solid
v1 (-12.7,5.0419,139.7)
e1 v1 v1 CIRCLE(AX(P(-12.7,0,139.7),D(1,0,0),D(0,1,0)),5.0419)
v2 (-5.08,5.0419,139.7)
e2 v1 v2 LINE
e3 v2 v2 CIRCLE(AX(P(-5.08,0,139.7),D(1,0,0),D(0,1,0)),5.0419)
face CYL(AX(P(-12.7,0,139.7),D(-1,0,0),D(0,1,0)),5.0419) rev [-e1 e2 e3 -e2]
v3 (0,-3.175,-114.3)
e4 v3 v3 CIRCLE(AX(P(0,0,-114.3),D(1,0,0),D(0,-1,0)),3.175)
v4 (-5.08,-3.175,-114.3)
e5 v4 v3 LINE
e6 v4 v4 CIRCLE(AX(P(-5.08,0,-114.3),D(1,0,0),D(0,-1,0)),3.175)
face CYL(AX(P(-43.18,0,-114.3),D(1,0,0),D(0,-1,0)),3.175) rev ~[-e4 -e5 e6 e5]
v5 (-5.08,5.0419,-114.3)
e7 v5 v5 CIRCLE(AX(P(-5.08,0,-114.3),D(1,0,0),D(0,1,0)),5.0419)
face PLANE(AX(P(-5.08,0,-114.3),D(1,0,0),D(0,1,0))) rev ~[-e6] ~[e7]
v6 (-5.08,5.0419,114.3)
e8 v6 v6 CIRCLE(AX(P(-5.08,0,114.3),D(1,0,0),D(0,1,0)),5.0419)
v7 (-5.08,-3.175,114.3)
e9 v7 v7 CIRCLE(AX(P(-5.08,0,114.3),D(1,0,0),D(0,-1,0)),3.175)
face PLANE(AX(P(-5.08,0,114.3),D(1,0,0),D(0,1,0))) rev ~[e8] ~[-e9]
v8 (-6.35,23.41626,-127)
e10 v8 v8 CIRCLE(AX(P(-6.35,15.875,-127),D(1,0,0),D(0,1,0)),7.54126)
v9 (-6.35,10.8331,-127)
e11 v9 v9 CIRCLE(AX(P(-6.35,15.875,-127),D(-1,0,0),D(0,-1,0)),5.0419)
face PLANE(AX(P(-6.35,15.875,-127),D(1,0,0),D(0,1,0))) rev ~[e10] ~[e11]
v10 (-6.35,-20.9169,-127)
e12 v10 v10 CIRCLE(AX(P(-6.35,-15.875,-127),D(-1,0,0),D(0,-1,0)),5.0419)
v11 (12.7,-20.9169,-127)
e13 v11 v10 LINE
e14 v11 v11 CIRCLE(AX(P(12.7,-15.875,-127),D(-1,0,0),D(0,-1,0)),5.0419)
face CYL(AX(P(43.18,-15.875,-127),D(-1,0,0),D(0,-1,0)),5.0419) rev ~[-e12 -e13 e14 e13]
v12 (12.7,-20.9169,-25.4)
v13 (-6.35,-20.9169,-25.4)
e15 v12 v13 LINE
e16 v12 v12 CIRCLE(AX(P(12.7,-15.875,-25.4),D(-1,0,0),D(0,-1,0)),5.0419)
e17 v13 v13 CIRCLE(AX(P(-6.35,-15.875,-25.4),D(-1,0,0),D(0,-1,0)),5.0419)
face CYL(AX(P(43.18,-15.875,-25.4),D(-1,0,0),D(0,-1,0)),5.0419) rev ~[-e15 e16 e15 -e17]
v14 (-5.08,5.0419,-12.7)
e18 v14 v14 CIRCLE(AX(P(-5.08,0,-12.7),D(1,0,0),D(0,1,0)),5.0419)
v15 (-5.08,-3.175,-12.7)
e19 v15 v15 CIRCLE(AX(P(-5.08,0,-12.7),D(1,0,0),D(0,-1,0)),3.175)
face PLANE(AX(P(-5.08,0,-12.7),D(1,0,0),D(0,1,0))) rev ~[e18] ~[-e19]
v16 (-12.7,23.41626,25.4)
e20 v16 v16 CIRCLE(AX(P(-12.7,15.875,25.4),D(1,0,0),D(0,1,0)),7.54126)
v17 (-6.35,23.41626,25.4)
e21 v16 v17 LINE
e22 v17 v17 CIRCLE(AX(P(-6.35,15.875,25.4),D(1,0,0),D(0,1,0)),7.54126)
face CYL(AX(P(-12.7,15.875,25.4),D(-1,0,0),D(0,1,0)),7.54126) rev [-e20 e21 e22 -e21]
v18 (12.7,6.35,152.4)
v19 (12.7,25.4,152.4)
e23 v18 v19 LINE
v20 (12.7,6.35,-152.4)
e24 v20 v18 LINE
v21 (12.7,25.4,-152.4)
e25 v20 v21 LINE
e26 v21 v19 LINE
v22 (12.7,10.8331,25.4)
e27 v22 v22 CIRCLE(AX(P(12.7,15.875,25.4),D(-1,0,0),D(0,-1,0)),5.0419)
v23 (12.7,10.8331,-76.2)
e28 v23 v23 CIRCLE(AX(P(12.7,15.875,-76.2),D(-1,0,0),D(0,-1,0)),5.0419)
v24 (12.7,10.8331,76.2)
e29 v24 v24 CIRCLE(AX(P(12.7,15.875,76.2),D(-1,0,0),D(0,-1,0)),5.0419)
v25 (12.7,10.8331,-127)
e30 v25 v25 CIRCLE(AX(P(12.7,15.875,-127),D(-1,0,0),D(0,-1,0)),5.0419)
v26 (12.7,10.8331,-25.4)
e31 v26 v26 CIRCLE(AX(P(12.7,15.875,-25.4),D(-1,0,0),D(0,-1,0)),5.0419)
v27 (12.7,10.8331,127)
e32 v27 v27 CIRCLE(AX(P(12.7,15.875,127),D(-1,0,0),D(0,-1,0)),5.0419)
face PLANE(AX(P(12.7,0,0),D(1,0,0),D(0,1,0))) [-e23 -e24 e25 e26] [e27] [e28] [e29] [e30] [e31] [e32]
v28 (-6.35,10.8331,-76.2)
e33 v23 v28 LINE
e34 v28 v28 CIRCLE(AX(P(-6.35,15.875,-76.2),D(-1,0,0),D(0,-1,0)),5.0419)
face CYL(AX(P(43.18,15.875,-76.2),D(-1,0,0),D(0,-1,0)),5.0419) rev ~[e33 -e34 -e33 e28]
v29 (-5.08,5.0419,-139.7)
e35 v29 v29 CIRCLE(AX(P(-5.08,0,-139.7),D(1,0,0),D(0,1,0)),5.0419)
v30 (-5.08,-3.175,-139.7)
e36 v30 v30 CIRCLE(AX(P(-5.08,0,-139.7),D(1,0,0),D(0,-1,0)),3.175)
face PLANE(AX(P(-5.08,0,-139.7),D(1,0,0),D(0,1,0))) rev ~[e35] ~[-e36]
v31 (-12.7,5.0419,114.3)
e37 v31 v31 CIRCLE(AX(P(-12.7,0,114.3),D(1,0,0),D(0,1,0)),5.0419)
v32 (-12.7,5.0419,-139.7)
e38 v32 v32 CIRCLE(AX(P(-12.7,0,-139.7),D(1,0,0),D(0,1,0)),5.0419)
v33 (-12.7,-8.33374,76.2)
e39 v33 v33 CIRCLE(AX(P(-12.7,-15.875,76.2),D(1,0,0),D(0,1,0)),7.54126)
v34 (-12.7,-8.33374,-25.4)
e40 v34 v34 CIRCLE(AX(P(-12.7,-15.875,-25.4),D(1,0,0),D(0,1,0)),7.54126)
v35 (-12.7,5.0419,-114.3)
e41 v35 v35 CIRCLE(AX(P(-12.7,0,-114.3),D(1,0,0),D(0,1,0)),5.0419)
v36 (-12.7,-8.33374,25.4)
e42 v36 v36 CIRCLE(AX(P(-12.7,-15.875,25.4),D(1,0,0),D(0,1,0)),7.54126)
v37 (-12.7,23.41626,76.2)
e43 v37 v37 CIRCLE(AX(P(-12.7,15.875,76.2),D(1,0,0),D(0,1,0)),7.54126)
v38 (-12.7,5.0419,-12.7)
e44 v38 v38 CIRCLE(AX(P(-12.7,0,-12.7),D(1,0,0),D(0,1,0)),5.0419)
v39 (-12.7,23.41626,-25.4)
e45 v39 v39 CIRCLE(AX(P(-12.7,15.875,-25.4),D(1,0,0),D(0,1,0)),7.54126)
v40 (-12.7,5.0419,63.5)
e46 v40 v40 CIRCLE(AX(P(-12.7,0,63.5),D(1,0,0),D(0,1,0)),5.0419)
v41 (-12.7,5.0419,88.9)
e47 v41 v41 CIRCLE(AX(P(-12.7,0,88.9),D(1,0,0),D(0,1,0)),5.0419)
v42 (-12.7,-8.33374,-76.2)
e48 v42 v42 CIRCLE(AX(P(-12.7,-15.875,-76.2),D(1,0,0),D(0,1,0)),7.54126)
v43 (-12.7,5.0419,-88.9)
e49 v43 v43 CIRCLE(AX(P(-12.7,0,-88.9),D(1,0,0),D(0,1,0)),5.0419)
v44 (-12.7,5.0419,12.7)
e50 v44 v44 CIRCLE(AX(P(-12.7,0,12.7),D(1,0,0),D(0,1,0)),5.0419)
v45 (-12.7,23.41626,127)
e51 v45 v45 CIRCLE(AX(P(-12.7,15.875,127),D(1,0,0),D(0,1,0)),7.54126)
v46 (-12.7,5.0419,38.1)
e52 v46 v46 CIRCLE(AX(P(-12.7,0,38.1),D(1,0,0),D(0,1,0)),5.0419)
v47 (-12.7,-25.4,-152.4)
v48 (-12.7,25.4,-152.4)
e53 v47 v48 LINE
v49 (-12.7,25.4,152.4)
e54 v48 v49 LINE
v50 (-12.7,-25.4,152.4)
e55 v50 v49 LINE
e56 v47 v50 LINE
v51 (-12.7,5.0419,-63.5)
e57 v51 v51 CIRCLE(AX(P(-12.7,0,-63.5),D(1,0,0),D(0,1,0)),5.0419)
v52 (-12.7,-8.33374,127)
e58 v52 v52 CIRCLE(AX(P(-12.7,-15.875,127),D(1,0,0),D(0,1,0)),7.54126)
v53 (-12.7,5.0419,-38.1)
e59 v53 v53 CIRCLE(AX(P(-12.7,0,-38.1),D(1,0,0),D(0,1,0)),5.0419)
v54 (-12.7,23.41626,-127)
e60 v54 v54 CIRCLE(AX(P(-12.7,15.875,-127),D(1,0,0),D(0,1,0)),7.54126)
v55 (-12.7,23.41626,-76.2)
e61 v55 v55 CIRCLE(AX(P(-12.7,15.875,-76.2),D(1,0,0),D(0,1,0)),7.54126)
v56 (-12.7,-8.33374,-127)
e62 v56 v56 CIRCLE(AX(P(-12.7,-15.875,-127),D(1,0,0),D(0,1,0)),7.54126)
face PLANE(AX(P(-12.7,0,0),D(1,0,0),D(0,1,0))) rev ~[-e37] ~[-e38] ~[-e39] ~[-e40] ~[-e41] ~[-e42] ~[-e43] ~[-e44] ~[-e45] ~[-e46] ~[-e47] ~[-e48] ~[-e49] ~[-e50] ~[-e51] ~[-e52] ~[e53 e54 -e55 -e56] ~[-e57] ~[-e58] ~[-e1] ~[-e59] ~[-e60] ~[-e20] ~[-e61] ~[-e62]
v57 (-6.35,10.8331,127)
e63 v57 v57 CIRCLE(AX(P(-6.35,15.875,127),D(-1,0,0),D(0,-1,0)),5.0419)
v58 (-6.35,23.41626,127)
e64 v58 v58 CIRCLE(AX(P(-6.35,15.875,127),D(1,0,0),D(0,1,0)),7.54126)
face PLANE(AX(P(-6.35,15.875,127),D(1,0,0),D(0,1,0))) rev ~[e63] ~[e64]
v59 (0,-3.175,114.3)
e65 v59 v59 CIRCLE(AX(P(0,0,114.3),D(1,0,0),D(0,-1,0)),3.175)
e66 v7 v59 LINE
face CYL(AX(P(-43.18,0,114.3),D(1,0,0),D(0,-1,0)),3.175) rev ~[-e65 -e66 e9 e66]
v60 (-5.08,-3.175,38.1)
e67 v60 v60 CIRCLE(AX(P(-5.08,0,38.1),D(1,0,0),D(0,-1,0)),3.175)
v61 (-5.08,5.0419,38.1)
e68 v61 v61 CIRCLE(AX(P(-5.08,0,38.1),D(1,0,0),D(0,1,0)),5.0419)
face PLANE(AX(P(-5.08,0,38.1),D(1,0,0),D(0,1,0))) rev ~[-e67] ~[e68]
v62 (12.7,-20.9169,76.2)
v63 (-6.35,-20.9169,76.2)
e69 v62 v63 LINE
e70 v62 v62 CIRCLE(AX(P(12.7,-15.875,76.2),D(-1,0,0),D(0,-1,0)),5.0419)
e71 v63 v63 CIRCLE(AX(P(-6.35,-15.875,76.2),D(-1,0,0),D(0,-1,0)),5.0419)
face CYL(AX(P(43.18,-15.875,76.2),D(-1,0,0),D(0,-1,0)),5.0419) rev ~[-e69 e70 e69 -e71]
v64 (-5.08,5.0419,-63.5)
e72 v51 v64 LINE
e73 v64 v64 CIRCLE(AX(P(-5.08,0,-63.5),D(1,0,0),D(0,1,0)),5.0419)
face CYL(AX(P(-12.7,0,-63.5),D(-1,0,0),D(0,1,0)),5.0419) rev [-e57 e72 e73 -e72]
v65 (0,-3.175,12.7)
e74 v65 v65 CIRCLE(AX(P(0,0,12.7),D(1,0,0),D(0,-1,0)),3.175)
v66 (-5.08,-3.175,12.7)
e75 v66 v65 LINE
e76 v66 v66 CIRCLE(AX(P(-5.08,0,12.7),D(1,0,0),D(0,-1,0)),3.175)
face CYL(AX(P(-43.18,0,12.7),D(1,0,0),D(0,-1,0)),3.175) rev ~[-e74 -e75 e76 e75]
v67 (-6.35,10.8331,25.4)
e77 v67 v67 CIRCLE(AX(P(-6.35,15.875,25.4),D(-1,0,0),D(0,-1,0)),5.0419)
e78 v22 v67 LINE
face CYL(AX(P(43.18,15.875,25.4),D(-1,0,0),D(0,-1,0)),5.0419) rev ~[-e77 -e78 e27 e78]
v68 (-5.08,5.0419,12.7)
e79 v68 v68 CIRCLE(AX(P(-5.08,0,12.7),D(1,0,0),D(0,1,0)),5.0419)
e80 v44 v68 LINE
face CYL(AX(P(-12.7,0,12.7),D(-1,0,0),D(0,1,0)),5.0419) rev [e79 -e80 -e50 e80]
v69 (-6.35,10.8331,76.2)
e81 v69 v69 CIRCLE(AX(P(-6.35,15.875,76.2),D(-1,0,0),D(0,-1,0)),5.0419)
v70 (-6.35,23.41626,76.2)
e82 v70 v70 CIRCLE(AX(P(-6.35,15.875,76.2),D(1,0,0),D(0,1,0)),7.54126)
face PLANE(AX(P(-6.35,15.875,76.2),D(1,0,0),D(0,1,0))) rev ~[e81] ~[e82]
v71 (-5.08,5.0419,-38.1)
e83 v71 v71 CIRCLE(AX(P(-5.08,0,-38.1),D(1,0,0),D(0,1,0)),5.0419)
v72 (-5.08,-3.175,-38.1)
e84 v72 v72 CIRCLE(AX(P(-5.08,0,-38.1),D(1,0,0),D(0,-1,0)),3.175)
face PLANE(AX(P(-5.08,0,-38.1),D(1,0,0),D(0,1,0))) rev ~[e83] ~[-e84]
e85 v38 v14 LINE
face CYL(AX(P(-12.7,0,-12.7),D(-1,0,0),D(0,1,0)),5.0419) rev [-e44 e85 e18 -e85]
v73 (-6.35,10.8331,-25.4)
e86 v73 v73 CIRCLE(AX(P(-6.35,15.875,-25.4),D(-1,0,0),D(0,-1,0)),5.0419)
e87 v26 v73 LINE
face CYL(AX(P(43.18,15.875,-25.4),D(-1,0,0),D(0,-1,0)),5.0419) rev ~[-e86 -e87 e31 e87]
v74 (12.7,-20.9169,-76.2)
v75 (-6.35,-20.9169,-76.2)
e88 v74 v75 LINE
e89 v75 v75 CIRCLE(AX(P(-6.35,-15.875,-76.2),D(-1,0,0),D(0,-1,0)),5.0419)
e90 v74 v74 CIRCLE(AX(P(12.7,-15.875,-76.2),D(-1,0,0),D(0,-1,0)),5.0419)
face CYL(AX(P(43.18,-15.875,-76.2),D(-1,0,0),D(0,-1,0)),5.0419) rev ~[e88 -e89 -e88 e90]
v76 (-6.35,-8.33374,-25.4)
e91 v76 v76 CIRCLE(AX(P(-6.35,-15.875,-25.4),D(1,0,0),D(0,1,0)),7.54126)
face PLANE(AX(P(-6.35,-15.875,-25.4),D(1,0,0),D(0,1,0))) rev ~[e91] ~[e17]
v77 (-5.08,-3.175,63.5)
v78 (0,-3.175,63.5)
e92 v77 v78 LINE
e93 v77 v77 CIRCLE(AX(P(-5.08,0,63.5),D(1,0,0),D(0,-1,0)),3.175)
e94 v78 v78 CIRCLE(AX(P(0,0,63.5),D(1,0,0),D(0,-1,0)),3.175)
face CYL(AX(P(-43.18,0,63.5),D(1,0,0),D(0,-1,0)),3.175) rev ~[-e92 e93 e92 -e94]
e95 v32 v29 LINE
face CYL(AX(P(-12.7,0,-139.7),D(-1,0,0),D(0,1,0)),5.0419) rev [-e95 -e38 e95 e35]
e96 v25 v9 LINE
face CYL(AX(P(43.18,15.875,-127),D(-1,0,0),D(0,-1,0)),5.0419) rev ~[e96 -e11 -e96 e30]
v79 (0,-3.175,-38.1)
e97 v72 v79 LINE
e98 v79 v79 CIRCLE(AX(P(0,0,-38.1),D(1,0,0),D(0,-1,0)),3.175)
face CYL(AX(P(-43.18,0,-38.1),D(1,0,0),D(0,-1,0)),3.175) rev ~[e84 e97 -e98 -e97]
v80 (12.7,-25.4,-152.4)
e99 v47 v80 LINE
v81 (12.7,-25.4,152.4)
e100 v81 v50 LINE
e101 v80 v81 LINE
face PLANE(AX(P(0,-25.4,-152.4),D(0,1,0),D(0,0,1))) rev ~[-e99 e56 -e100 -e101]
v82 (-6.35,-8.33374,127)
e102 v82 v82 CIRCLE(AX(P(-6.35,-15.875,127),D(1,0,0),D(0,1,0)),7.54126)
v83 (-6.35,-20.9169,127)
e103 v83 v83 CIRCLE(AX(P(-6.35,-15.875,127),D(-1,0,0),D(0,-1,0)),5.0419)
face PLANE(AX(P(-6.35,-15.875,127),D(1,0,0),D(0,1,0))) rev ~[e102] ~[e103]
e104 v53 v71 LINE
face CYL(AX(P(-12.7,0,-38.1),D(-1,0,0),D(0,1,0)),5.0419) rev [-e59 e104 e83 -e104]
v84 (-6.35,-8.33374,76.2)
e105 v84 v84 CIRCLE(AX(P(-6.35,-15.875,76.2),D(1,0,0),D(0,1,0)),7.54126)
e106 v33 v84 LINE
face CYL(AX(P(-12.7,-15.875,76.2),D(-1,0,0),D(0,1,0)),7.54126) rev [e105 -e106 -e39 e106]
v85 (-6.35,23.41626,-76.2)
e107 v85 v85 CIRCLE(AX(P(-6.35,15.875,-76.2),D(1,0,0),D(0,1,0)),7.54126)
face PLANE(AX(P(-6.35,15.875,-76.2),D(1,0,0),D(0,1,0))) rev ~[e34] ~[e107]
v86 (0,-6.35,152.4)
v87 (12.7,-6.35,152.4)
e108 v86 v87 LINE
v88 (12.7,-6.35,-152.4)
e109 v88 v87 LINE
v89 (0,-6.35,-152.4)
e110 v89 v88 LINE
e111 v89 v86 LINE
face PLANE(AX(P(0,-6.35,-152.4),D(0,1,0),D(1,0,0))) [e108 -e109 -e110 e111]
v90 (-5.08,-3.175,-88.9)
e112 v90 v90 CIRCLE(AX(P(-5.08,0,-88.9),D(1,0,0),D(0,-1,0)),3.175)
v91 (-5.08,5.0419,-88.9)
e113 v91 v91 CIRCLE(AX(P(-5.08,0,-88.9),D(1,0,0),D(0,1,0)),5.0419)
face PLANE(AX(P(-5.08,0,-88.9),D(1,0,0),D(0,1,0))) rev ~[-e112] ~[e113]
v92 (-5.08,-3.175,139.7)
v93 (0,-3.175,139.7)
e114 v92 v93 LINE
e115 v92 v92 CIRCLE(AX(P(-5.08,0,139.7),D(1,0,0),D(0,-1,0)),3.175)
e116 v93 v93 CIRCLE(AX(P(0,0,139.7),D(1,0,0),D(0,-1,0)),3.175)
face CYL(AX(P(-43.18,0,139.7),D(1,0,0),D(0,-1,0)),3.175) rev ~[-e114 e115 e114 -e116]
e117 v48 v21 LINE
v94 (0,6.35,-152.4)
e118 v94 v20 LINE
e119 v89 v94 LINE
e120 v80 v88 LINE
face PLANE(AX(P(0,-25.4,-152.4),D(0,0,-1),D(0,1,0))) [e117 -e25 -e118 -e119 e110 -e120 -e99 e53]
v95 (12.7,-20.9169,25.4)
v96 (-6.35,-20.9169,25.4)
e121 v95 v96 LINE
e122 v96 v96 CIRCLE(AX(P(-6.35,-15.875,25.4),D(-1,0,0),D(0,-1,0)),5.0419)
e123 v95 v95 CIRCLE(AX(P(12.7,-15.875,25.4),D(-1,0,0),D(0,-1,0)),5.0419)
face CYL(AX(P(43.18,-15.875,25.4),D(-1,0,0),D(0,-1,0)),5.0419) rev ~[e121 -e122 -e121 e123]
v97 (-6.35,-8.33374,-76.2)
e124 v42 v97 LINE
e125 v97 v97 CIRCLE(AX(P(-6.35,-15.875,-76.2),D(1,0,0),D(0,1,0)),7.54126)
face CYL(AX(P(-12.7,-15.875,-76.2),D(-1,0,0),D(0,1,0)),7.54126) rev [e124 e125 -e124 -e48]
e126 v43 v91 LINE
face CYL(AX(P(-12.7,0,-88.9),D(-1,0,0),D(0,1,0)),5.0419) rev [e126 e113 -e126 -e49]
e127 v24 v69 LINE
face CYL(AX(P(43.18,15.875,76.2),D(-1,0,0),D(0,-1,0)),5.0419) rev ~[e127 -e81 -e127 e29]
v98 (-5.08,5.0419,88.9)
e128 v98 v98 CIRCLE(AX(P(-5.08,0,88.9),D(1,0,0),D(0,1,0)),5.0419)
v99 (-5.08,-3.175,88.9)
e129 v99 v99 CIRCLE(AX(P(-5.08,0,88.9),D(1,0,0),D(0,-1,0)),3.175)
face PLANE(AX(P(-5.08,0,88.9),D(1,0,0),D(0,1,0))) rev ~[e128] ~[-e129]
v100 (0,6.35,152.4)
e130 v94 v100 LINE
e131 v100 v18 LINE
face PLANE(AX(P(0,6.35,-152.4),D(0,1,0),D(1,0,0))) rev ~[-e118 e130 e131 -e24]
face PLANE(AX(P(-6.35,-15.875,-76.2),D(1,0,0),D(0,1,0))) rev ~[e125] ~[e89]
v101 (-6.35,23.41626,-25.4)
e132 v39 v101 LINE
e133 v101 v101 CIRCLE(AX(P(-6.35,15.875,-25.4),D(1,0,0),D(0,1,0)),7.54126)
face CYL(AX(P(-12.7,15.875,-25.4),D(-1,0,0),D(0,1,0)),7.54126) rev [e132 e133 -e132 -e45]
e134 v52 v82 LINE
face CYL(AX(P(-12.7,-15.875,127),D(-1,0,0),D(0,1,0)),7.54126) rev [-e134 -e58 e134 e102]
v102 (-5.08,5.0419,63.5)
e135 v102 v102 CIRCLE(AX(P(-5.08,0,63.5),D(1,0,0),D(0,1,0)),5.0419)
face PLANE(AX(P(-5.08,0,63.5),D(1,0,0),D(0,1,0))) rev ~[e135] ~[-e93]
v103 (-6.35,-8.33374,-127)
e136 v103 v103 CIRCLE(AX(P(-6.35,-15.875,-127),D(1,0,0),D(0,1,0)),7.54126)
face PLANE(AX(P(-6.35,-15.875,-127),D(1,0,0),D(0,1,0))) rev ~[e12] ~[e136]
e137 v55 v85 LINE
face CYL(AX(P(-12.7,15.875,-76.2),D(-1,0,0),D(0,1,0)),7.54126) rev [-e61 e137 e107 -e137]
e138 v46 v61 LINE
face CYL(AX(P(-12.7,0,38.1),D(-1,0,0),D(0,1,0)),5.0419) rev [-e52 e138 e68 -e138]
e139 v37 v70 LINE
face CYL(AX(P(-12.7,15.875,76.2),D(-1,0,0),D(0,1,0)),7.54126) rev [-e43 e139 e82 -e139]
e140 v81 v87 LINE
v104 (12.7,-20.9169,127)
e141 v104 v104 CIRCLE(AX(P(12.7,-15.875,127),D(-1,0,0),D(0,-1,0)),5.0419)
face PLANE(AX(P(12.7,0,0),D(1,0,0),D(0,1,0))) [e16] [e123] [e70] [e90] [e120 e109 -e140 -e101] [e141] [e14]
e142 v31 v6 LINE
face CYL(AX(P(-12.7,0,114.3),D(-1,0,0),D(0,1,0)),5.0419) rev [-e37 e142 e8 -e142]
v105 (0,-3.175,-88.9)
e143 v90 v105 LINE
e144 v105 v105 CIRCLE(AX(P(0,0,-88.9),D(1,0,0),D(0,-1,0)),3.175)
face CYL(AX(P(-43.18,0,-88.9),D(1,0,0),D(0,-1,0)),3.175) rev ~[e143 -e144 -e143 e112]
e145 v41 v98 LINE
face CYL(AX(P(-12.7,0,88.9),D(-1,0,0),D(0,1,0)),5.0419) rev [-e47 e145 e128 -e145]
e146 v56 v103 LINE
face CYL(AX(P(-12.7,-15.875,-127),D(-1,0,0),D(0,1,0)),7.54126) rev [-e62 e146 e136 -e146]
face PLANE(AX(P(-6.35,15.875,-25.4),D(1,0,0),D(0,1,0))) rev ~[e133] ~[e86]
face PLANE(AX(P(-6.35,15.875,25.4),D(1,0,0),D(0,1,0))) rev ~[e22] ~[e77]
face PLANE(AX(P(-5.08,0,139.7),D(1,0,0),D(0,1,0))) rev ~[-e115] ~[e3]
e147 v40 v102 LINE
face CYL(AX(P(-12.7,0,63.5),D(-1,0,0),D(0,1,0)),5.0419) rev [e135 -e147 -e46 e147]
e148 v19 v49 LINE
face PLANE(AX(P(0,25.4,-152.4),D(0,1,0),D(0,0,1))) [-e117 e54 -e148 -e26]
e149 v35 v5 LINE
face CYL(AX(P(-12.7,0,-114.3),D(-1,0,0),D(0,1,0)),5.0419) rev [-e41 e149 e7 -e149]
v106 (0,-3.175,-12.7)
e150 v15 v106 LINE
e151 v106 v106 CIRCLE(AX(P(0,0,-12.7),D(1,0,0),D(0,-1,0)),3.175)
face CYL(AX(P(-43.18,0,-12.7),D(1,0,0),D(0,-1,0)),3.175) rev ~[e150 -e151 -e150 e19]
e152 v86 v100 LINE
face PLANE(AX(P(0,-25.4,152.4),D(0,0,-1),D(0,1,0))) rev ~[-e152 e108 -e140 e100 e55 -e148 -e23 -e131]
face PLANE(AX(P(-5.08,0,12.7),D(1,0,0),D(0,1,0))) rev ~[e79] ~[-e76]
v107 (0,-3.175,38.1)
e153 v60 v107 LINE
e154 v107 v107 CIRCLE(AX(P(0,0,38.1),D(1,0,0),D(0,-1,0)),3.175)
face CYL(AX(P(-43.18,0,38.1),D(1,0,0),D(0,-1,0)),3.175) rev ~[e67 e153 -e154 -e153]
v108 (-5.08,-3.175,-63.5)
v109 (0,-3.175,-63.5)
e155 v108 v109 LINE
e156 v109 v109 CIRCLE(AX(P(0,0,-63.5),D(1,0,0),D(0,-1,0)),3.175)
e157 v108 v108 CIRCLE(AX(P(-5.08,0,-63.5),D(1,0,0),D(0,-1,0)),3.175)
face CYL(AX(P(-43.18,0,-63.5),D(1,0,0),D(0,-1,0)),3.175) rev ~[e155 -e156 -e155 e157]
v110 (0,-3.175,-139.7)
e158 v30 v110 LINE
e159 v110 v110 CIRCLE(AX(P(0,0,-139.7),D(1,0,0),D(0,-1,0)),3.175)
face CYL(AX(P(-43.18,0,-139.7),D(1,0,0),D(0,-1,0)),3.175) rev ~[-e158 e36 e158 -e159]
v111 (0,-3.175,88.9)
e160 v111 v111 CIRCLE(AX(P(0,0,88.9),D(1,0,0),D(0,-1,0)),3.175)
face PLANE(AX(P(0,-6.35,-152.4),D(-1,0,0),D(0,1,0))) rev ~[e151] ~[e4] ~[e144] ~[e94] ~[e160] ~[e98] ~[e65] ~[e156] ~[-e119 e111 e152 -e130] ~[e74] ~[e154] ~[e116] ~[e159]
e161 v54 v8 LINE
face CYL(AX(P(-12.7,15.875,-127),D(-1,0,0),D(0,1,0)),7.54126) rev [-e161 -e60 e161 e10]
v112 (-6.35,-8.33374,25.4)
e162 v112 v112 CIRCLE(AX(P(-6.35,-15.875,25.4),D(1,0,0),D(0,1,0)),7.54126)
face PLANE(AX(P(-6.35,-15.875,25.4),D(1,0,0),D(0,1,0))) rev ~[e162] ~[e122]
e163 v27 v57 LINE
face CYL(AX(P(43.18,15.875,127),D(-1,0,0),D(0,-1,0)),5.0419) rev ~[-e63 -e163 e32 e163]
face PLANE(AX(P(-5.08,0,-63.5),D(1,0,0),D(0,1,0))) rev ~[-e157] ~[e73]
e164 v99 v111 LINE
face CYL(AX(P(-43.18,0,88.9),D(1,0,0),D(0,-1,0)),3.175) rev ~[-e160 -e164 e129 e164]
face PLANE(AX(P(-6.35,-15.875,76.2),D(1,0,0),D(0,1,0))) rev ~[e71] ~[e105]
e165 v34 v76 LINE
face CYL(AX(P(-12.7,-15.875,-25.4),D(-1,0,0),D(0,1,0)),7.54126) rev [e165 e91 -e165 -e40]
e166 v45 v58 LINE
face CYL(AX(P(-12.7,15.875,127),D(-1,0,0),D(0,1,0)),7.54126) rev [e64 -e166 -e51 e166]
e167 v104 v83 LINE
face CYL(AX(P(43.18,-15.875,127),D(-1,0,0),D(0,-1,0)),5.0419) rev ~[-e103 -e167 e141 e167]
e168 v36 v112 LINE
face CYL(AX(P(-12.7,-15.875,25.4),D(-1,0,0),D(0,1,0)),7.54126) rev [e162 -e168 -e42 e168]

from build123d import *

# Parameters (mm, degrees)
F0_W      = 50.8
F0_H      = 304.8
F1_DEPTH  = 12.7
F3_W      = 12.7
F3_H      = 12.7
F4_DEPTH  = 304.8
F7_D      = 10.0838
F7_DEPTH  = 30.48
F7_TIP    = 3.0294791551
F9_R      = 7.54126
F9_R_2    = 3.302
F10_DEPTH = 6.35
F12_D     = 6.35
F12_DEPTH = 30.48
F12_TIP   = 1.9077324654
F13_R     = 5.0419
F13_R_2   = 2.54
F14_DEPTH = 7.62


# Not quite as in the source:
# - a feature names something its author has since deleted; it is built from what else it names


with BuildPart() as f1:
    # F0 (on Right) → F1 (new body, symmetric)
    with BuildSketch(Plane.YZ):
        Rectangle(F0_W, F0_H)
    extrude(amount=F1_DEPTH, both=True)

    # F3 (on offset) → F4 (cut)
    with BuildSketch(Plane.XY.offset(-152.4)):
        with Locations((6.35, 0)):
            Rectangle(F3_W, F3_H)
    extrude(amount=F4_DEPTH, mode=Mode.SUBTRACT)

    # F7
    with Locations(Plane.YZ.offset(12.7)):
        with Locations((-15.875, 76.2), (15.875, 76.2), (15.875, 25.4), (-15.875, 25.4), (-15.875, -25.4), (15.875, -25.4), (15.875, -127), (-15.875, -127), (-15.875, -76.2), (15.875, -76.2), (-15.875, 127), (15.875, 127)):
            Hole(F7_D / 2, depth=F7_DEPTH)
            with Locations((0, 0, -(F7_DEPTH + F7_TIP / 2))):  # 118° drill point
                Cone(0, F7_D / 2, F7_TIP, mode=Mode.SUBTRACT)

    # F9 (on offset) → F10 (cut)
    with BuildSketch(Plane.YZ.offset(-12.7)):
        with Locations((15.875, 127)):
            Circle(F9_R)
        with Locations((15.875, 127)):
            Circle(F9_R_2, mode=Mode.SUBTRACT)
        with Locations((-15.875, 127)):
            Circle(F9_R)
        with Locations((-15.875, 127)):
            Circle(F9_R_2, mode=Mode.SUBTRACT)
        with Locations((-15.875, 76.2)):
            Circle(F9_R)
        with Locations((-15.875, 76.2)):
            Circle(F9_R_2, mode=Mode.SUBTRACT)
        with Locations((15.875, 76.2)):
            Circle(F9_R)
        with Locations((15.875, 76.2)):
            Circle(F9_R_2, mode=Mode.SUBTRACT)
        with Locations((15.875, 25.4)):
            Circle(F9_R)
        with Locations((15.875, 25.4)):
            Circle(F9_R_2, mode=Mode.SUBTRACT)
        with Locations((-15.875, 25.4)):
            Circle(F9_R)
        with Locations((-15.875, 25.4)):
            Circle(F9_R_2, mode=Mode.SUBTRACT)
        with Locations((15.875, -25.4)):
            Circle(F9_R)
        with Locations((15.875, -25.4)):
            Circle(F9_R_2, mode=Mode.SUBTRACT)
        with Locations((-15.875, -25.4)):
            Circle(F9_R)
        with Locations((-15.875, -25.4)):
            Circle(F9_R_2, mode=Mode.SUBTRACT)
        with Locations((-15.875, -76.2)):
            Circle(F9_R)
        with Locations((-15.875, -76.2)):
            Circle(F9_R_2, mode=Mode.SUBTRACT)
        with Locations((15.875, -76.2)):
            Circle(F9_R)
        with Locations((15.875, -76.2)):
            Circle(F9_R_2, mode=Mode.SUBTRACT)
        with Locations((15.875, -127)):
            Circle(F9_R)
        with Locations((15.875, -127)):
            Circle(F9_R_2, mode=Mode.SUBTRACT)
        with Locations((-15.875, -127)):
            Circle(F9_R)
        with Locations((-15.875, -127)):
            Circle(F9_R_2, mode=Mode.SUBTRACT)
    extrude(amount=F10_DEPTH, mode=Mode.SUBTRACT)

    # F12
    with Locations(Plane(origin=(-12.7, 0, 0), x_dir=(0, 1, 0), z_dir=(-1, 0, 0))):
        with Locations((0, -139.7), (0, -114.3), (0, -88.9), (0, -63.5), (0, -38.1), (0, 12.7), (0, -12.7), (0, 38.1), (0, 63.5), (0, 114.3), (0, 139.7), (0, 88.9)):
            Hole(F12_D / 2, depth=F12_DEPTH)
            with Locations((0, 0, -(F12_DEPTH + F12_TIP / 2))):  # 118° drill point
                Cone(0, F12_D / 2, F12_TIP, mode=Mode.SUBTRACT)

    # F13 (on offset) → F14 (cut)
    with BuildSketch(Plane.YZ.offset(-12.7)):
        with Locations((0, 139.7)):
            Circle(F13_R)
        with Locations((0, 139.7)):
            Circle(F13_R_2, mode=Mode.SUBTRACT)
        with Locations((0, 114.3)):
            Circle(F13_R)
        with Locations((0, 114.3)):
            Circle(F13_R_2, mode=Mode.SUBTRACT)
        with Locations((0, 88.9)):
            Circle(F13_R)
        with Locations((0, 88.9)):
            Circle(F13_R_2, mode=Mode.SUBTRACT)
        with Locations((0, 63.5)):
            Circle(F13_R)
        with Locations((0, 63.5)):
            Circle(F13_R_2, mode=Mode.SUBTRACT)
        with Locations((0, 38.1)):
            Circle(F13_R)
        with Locations((0, 38.1)):
            Circle(F13_R_2, mode=Mode.SUBTRACT)
        with Locations((0, 12.7)):
            Circle(F13_R)
        with Locations((0, 12.7)):
            Circle(F13_R_2, mode=Mode.SUBTRACT)
        with Locations((0, -12.7)):
            Circle(F13_R)
        with Locations((0, -12.7)):
            Circle(F13_R_2, mode=Mode.SUBTRACT)
        with Locations((0, -38.1)):
            Circle(F13_R)
        with Locations((0, -38.1)):
            Circle(F13_R_2, mode=Mode.SUBTRACT)
        with Locations((0, -63.5)):
            Circle(F13_R)
        with Locations((0, -63.5)):
            Circle(F13_R_2, mode=Mode.SUBTRACT)
        with Locations((0, -88.9)):
            Circle(F13_R)
        with Locations((0, -88.9)):
            Circle(F13_R_2, mode=Mode.SUBTRACT)
        with Locations((0, -114.3)):
            Circle(F13_R)
        with Locations((0, -114.3)):
            Circle(F13_R_2, mode=Mode.SUBTRACT)
        with Locations((0, -139.7)):
            Circle(F13_R)
        with Locations((0, -139.7)):
            Circle(F13_R_2, mode=Mode.SUBTRACT)
    extrude(amount=F14_DEPTH, mode=Mode.SUBTRACT)


solid = f1.part
